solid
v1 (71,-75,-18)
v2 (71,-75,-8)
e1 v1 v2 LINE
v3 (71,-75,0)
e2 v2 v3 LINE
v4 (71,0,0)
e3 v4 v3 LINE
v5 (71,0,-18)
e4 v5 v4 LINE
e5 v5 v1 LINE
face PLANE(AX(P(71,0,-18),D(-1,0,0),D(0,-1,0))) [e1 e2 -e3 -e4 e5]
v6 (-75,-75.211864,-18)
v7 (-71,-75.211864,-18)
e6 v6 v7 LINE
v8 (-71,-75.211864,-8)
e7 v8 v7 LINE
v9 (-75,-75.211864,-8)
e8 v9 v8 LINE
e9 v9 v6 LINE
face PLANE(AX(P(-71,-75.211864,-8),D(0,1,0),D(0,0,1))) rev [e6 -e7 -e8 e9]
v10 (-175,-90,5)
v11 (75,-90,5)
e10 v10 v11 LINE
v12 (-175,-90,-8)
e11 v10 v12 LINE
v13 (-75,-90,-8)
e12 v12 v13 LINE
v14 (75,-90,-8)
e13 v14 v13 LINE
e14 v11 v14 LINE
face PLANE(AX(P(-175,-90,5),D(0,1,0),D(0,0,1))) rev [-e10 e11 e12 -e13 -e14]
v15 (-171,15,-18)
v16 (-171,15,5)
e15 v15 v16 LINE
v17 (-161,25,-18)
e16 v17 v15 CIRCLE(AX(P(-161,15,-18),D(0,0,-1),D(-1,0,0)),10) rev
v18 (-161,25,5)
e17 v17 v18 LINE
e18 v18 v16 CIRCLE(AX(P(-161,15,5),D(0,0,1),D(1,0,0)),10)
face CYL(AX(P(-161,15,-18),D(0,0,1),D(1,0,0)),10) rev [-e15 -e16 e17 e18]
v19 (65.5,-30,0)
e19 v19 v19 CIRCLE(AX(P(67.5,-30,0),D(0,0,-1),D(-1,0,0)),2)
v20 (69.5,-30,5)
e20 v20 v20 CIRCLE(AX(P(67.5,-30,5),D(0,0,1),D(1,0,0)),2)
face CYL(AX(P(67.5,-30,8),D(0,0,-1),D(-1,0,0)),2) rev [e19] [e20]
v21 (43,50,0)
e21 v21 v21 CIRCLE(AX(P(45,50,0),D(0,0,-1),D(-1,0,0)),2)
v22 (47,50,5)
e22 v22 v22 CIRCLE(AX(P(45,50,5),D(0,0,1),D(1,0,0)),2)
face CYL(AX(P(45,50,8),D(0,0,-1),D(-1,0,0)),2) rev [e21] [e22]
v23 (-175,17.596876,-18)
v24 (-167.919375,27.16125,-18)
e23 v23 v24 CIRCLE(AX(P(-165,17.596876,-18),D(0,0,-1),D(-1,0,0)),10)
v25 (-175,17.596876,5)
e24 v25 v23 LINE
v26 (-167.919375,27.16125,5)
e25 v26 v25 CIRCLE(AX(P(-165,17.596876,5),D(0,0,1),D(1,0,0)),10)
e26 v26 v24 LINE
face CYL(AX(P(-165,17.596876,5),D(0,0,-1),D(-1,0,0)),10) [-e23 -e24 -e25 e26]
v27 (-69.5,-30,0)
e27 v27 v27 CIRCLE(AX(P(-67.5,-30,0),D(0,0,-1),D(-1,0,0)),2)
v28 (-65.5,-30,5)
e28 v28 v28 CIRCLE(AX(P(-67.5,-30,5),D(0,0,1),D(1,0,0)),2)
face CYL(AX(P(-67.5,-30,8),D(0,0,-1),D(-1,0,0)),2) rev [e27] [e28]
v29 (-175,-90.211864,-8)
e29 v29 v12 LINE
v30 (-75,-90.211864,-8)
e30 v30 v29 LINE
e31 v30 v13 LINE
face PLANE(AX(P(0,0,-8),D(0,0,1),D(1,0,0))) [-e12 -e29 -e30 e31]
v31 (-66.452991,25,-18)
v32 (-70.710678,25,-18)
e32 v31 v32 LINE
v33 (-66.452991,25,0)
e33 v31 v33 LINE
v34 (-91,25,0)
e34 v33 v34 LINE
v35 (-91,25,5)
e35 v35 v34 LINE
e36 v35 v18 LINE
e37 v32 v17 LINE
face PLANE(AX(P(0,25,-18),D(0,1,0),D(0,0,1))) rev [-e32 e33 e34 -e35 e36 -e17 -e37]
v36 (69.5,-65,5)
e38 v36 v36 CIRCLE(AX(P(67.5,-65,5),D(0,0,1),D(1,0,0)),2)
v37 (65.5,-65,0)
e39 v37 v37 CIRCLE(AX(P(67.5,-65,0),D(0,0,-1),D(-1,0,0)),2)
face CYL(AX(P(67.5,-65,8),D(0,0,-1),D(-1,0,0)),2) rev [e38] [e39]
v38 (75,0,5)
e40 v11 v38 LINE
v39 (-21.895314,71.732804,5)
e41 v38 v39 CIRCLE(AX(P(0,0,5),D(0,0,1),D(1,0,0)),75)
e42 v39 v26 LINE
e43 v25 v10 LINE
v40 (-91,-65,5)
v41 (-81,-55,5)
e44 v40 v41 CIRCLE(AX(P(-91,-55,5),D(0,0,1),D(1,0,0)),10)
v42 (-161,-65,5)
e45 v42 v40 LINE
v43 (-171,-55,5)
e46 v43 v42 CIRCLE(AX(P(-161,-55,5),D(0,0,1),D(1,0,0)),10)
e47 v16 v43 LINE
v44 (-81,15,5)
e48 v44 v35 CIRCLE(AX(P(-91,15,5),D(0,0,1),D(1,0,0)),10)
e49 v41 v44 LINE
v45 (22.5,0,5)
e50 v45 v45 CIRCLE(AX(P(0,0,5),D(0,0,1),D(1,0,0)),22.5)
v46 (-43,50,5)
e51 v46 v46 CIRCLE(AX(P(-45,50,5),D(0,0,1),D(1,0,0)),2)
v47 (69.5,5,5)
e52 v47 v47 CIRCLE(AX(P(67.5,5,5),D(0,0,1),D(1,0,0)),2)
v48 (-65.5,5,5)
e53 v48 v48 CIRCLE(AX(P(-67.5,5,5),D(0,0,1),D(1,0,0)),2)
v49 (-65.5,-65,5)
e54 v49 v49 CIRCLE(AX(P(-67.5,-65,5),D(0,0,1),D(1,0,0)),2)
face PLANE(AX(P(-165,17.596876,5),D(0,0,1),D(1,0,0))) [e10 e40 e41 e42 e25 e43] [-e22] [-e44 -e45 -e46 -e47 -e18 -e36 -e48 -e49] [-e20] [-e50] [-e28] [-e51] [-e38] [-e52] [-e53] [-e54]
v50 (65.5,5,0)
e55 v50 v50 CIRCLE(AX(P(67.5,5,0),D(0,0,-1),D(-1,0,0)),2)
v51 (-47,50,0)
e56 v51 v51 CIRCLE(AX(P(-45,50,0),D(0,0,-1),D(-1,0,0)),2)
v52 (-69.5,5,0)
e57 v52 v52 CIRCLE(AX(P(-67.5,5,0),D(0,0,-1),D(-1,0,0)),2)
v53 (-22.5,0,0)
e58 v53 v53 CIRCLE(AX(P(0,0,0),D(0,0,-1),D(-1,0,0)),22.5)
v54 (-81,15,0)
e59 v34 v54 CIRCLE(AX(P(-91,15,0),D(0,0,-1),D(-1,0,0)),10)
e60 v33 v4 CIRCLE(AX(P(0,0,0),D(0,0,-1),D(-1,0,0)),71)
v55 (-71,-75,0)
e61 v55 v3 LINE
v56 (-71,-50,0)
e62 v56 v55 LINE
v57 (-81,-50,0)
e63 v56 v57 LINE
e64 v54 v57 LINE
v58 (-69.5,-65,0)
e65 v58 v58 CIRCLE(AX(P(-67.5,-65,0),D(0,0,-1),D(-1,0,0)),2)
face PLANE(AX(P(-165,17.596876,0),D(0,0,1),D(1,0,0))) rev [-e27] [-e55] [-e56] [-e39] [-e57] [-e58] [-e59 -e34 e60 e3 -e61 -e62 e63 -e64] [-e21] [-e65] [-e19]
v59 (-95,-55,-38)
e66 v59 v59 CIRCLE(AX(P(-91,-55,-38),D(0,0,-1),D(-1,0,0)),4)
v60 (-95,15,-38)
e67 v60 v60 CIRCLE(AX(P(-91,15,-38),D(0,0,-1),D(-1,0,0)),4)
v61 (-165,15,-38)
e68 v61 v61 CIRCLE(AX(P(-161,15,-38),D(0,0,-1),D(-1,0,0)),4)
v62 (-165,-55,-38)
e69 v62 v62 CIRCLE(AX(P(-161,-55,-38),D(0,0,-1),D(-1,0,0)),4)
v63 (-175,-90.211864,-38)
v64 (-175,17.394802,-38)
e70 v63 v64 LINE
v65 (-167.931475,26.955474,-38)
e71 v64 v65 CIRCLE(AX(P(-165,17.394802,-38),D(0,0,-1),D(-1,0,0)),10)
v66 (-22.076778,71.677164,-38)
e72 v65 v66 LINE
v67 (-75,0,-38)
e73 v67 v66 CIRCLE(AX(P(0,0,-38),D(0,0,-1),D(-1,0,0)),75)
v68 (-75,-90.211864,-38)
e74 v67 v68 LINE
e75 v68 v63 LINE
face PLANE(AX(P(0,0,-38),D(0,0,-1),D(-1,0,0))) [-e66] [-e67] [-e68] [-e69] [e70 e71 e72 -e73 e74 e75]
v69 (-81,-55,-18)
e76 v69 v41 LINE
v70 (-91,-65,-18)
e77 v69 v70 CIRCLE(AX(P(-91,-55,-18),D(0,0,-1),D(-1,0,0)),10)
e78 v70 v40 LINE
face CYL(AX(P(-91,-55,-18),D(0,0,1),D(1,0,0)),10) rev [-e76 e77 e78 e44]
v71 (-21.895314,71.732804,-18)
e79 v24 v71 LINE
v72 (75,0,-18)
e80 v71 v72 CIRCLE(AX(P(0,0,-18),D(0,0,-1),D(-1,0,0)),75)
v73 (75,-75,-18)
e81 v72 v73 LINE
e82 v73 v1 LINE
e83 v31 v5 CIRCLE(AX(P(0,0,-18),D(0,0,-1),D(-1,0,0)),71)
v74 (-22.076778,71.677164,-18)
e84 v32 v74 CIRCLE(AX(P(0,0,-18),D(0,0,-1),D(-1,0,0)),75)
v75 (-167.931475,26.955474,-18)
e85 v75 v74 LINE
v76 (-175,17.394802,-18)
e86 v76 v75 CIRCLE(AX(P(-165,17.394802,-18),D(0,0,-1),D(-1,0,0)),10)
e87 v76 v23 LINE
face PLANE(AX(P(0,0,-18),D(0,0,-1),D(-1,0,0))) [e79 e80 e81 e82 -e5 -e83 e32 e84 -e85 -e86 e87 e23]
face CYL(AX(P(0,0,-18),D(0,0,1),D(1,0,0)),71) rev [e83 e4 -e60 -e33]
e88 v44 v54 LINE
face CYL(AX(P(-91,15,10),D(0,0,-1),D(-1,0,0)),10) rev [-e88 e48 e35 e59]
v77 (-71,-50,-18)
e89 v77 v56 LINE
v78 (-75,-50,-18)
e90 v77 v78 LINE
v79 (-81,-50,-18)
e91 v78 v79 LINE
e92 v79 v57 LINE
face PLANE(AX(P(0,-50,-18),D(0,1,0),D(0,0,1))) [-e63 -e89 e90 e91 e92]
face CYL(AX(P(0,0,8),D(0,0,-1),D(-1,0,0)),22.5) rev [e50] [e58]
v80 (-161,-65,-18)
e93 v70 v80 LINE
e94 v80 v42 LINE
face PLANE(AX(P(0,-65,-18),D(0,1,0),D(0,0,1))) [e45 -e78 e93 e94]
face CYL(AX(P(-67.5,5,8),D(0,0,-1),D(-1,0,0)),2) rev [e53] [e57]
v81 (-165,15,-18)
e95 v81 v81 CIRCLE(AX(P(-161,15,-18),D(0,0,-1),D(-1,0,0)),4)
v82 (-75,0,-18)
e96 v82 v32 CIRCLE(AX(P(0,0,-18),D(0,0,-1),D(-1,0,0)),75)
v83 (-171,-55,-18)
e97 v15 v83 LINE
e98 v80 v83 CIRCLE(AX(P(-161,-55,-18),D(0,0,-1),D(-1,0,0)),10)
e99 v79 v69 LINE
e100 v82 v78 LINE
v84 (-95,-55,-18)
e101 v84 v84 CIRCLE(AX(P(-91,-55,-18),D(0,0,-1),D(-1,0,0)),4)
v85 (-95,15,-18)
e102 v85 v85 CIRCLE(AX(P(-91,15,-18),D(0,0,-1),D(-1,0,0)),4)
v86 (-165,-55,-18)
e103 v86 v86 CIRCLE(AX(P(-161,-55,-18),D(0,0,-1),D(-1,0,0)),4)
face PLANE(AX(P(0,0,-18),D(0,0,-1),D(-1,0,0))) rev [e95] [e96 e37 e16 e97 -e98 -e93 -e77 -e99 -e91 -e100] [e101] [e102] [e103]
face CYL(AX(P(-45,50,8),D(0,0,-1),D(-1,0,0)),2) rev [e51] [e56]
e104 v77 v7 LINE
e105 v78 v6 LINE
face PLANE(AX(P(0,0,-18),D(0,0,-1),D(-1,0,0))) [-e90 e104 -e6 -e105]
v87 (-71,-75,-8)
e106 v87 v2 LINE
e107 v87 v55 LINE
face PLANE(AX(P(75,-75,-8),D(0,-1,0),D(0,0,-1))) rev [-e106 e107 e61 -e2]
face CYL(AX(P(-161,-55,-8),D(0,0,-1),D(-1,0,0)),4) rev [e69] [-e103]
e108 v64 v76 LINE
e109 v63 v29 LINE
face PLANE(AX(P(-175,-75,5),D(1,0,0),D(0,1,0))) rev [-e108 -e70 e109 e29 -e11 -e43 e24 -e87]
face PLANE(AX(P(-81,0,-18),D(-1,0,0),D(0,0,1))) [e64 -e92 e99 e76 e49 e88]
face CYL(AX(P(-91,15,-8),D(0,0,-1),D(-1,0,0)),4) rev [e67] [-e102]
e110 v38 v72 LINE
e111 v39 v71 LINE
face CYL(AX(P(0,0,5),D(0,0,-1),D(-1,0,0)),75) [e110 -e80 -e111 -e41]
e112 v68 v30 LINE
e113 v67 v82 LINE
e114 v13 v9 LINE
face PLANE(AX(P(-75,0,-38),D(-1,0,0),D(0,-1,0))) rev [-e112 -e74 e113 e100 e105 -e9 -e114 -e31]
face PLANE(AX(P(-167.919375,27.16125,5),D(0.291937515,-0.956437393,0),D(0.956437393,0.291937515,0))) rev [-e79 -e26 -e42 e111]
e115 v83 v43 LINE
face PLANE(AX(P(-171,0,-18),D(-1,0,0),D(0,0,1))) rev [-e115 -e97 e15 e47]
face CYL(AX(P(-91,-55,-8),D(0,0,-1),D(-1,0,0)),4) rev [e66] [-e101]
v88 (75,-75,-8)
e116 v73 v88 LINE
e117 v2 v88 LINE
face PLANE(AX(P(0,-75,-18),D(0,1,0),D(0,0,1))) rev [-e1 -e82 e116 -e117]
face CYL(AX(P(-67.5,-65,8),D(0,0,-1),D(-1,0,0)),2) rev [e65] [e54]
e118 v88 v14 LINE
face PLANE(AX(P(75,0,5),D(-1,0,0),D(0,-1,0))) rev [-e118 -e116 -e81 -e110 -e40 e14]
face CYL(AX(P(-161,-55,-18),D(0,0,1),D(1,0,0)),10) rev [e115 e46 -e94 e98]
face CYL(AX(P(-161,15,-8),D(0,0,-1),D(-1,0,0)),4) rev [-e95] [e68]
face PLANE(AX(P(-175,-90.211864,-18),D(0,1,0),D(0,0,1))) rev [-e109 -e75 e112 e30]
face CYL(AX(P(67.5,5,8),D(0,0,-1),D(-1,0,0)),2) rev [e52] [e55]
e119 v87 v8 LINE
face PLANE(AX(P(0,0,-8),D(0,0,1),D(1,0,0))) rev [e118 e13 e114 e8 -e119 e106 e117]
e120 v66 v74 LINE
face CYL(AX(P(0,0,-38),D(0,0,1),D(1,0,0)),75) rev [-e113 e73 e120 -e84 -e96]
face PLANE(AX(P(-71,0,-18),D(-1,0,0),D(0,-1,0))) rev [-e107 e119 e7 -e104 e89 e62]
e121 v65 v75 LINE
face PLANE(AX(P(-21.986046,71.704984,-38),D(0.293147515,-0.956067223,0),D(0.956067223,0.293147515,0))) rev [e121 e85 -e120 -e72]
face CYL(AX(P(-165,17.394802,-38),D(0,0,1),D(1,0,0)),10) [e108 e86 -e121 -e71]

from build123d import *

# Parameters (mm, degrees)
BOSS_EXTRUDE8_DEPTH  = 5
SKETCH18_W           = 250
SKETCH18_H           = 15
BOSS_EXTRUDE9_DEPTH  = 8
SKETCH19_R           = 22.5
SKETCH19_R_2         = 2
CUT_EXTRUDE4_DEPTH   = 8
SKETCH20_R           = 2
CUT_EXTRUDE5_DEPTH   = 8
BOSS_EXTRUDE11_START = 18
BOSS_EXTRUDE11_DEPTH = 18
SKETCH22_W           = 104
SKETCH22_H           = 15.211863575
BOSS_EXTRUDE12_DEPTH = 10
CUT_EXTRUDE6_DEPTH   = 10
BOSS_EXTRUDE13_DEPTH = 20
SKETCH26_R           = 4
CUT_EXTRUDE7_DEPTH   = 30
SKETCH27_W           = 4
SKETCH27_H           = 15
CUT_EXTRUDE8_DEPTH   = 10


# Read off the part's stored shape, not the designer's step: Boss-Extrude13
with BuildPart() as part:
    # Sketch13 → Boss-Extrude8 (new body)
    with BuildSketch(Plane.XY):
        with BuildLine():
            Line((-167.919375153, 27.161249695), (-21.895313644, 71.732804493))
            ThreePointArc((-21.895313644, 71.732804493), (44.625393425, 60.279136205), (75, 0))
            Line((75, 0), (75, -75))
            Line((75, -75), (75, -90))
            Line((75, -90), (-175, -90))
            Line((-175, -90), (-175, -75))
            Line((-175, -75), (-175, 17.596875763))
            ThreePointArc((-175, 17.596875763), (-173.037218161, 23.546928219), (-167.919375153, 27.161249695))
        make_face()
    extrude(amount=BOSS_EXTRUDE8_DEPTH)

    # Sketch18 → Boss-Extrude9 (add)
    with BuildSketch(Plane(origin=(0, 0, 0), x_dir=(-1, 0, 0), z_dir=(0, 0, -1))):
        with Locations((50, -82.5)):
            Rectangle(SKETCH18_W, SKETCH18_H)
    extrude(amount=BOSS_EXTRUDE9_DEPTH)

    # Sketch19 → Cut-Extrude4 (cut)
    with BuildSketch(Plane(origin=(0, 0, 0), x_dir=(-1, 0, 0), z_dir=(0, 0, -1))):
        Circle(SKETCH19_R)
        with Locations((-67.5, -65)):
            Circle(SKETCH19_R_2)
        with Locations((67.5, -65)):
            Circle(SKETCH19_R_2)
        with Locations((67.5, -30)):
            Circle(SKETCH19_R_2)
        with Locations((67.5, 5)):
            Circle(SKETCH19_R_2)
        with Locations((-67.5, -30)):
            Circle(SKETCH19_R_2)
        with Locations((-67.5, 5)):
            Circle(SKETCH19_R_2)
    extrude(amount=-CUT_EXTRUDE4_DEPTH, mode=Mode.SUBTRACT)

    # Sketch20 → Cut-Extrude5 (cut)
    with BuildSketch(Plane(origin=(0, 0, 0), x_dir=(-1, 0, 0), z_dir=(0, 0, -1))):
        with Locations((-45, 50)):
            Circle(SKETCH20_R)
        with Locations((45, 50)):
            Circle(SKETCH20_R)
    extrude(amount=-CUT_EXTRUDE5_DEPTH, mode=Mode.SUBTRACT)

    # Sketch21 → Boss-Extrude11 (add)
    with BuildSketch(Plane(origin=(0, 0, 0), x_dir=(-1, 0, 0), z_dir=(0, 0, -1)).offset(BOSS_EXTRUDE11_START)):
        with BuildLine():
            Line((167.919375153, 27.161249695), (21.895313644, 71.732804493))
            ThreePointArc((21.895313644, 71.732804493), (51.864787491, 54.176044692), (70.710678119, 25))
            Line((70.710678119, 25), (91, 25))
            Line((91, 25), (161, 25))
            ThreePointArc((161, 25), (168.071067812, 22.071067812), (171, 15))
            Line((171, 15), (171, -55))
            ThreePointArc((171, -55), (168.071067812, -62.071067812), (161, -65))
            Line((161, -65), (91, -65))
            ThreePointArc((91, -65), (83.928932188, -62.071067812), (81, -55))
            Line((81, -55), (81, -50))
            Line((81, -50), (71, -50))
            Line((71, -50), (71, -75))
            Line((71, -75), (75, -75))
            Line((75, -75), (85, -75))
            Line((85, -75), (175, -75))
            Line((175, -75), (175, 17.596875763))
            ThreePointArc((175, 17.596875763), (173.037218161, 23.546928219), (167.919375153, 27.161249695))
        make_face()
        with BuildLine():
            ThreePointArc((21.895313644, 71.732804493), (-44.625393425, 60.279136205), (-75, 0))
            Line((-75, 0), (-75, -75))
            Line((-75, -75), (-71, -75))
            Line((-71, -75), (-71, 0))
            ThreePointArc((-71, 0), (-12.705070757, 69.853999006), (66.452990903, 25))
            Line((66.452990903, 25), (70.710678119, 25))
            ThreePointArc((70.710678119, 25), (51.864787491, 54.176044692), (21.895313644, 71.732804493))
        make_face()
    extrude(amount=-BOSS_EXTRUDE11_DEPTH)

    # Sketch22 → Boss-Extrude12 (add)
    with BuildSketch(Plane(origin=(0, 0, -8), x_dir=(-1, 0, 0), z_dir=(0, 0, -1))):
        with Locations((123, -82.605931787)):
            Rectangle(SKETCH22_W, SKETCH22_H)
    extrude(amount=BOSS_EXTRUDE12_DEPTH)

    # Sketch24 → Cut-Extrude6 (cut)
    with BuildSketch(Plane(origin=(0, 0, 0), x_dir=(-1, 0, 0), z_dir=(0, 0, -1))):
        with BuildLine():
            Line((91, 25), (161, 25))
            ThreePointArc((161, 25), (168.071067812, 22.071067812), (171, 15))
            Line((171, 15), (171, -55))
            ThreePointArc((171, -55), (168.071067812, -62.071067812), (161, -65))
            Line((161, -65), (91, -65))
            ThreePointArc((91, -65), (83.928932188, -62.071067812), (81, -55))
            Line((81, -55), (81, 15))
            ThreePointArc((81, 15), (83.928932188, 22.071067812), (91, 25))
        make_face()
    extrude(amount=-CUT_EXTRUDE6_DEPTH, mode=Mode.SUBTRACT)

    # Boss-Extrude13 outline → Boss-Extrude13 (add)
    with BuildSketch(Plane(origin=(0, 0, -18), x_dir=(-1, 0, 0), z_dir=(0, 0, -1))):
        with BuildLine():
            Line((175, -90.211863575), (175, 17.394801859))
            ThreePointArc((175, 17.394801859), (173.040981021, 23.339768152), (167.931475155, 26.955474085))
            Line((167.931475155, 26.955474085), (22.076778478, 71.67716409))
            ThreePointArc((22.076778478, 71.67716409), (60.335554965, 44.549083123), (75, 0))
            Line((75, 0), (75, -90.211863575))
            Line((75, -90.211863575), (175, -90.211863575))
        make_face()
    extrude(amount=BOSS_EXTRUDE13_DEPTH)

    # Sketch26 → Cut-Extrude7 (cut)
    with BuildSketch(Plane(origin=(0, 0, -38), x_dir=(-1, 0, 0), z_dir=(0, 0, -1))):
        with Locations((161, 15)):
            Circle(SKETCH26_R)
        with Locations((91, 15)):
            Circle(SKETCH26_R)
        with Locations((91, -55)):
            Circle(SKETCH26_R)
        with Locations((161, -55)):
            Circle(SKETCH26_R)
    extrude(amount=-CUT_EXTRUDE7_DEPTH, mode=Mode.SUBTRACT)

    # Sketch27 → Cut-Extrude8 (cut)
    with BuildSketch(Plane(origin=(0, 0, -18), x_dir=(-1, 0, 0), z_dir=(0, 0, -1))):
        with Locations((73, -82.711863575)):
            Rectangle(SKETCH27_W, SKETCH27_H)
    extrude(amount=-CUT_EXTRUDE8_DEPTH, mode=Mode.SUBTRACT)


solid = part.part
